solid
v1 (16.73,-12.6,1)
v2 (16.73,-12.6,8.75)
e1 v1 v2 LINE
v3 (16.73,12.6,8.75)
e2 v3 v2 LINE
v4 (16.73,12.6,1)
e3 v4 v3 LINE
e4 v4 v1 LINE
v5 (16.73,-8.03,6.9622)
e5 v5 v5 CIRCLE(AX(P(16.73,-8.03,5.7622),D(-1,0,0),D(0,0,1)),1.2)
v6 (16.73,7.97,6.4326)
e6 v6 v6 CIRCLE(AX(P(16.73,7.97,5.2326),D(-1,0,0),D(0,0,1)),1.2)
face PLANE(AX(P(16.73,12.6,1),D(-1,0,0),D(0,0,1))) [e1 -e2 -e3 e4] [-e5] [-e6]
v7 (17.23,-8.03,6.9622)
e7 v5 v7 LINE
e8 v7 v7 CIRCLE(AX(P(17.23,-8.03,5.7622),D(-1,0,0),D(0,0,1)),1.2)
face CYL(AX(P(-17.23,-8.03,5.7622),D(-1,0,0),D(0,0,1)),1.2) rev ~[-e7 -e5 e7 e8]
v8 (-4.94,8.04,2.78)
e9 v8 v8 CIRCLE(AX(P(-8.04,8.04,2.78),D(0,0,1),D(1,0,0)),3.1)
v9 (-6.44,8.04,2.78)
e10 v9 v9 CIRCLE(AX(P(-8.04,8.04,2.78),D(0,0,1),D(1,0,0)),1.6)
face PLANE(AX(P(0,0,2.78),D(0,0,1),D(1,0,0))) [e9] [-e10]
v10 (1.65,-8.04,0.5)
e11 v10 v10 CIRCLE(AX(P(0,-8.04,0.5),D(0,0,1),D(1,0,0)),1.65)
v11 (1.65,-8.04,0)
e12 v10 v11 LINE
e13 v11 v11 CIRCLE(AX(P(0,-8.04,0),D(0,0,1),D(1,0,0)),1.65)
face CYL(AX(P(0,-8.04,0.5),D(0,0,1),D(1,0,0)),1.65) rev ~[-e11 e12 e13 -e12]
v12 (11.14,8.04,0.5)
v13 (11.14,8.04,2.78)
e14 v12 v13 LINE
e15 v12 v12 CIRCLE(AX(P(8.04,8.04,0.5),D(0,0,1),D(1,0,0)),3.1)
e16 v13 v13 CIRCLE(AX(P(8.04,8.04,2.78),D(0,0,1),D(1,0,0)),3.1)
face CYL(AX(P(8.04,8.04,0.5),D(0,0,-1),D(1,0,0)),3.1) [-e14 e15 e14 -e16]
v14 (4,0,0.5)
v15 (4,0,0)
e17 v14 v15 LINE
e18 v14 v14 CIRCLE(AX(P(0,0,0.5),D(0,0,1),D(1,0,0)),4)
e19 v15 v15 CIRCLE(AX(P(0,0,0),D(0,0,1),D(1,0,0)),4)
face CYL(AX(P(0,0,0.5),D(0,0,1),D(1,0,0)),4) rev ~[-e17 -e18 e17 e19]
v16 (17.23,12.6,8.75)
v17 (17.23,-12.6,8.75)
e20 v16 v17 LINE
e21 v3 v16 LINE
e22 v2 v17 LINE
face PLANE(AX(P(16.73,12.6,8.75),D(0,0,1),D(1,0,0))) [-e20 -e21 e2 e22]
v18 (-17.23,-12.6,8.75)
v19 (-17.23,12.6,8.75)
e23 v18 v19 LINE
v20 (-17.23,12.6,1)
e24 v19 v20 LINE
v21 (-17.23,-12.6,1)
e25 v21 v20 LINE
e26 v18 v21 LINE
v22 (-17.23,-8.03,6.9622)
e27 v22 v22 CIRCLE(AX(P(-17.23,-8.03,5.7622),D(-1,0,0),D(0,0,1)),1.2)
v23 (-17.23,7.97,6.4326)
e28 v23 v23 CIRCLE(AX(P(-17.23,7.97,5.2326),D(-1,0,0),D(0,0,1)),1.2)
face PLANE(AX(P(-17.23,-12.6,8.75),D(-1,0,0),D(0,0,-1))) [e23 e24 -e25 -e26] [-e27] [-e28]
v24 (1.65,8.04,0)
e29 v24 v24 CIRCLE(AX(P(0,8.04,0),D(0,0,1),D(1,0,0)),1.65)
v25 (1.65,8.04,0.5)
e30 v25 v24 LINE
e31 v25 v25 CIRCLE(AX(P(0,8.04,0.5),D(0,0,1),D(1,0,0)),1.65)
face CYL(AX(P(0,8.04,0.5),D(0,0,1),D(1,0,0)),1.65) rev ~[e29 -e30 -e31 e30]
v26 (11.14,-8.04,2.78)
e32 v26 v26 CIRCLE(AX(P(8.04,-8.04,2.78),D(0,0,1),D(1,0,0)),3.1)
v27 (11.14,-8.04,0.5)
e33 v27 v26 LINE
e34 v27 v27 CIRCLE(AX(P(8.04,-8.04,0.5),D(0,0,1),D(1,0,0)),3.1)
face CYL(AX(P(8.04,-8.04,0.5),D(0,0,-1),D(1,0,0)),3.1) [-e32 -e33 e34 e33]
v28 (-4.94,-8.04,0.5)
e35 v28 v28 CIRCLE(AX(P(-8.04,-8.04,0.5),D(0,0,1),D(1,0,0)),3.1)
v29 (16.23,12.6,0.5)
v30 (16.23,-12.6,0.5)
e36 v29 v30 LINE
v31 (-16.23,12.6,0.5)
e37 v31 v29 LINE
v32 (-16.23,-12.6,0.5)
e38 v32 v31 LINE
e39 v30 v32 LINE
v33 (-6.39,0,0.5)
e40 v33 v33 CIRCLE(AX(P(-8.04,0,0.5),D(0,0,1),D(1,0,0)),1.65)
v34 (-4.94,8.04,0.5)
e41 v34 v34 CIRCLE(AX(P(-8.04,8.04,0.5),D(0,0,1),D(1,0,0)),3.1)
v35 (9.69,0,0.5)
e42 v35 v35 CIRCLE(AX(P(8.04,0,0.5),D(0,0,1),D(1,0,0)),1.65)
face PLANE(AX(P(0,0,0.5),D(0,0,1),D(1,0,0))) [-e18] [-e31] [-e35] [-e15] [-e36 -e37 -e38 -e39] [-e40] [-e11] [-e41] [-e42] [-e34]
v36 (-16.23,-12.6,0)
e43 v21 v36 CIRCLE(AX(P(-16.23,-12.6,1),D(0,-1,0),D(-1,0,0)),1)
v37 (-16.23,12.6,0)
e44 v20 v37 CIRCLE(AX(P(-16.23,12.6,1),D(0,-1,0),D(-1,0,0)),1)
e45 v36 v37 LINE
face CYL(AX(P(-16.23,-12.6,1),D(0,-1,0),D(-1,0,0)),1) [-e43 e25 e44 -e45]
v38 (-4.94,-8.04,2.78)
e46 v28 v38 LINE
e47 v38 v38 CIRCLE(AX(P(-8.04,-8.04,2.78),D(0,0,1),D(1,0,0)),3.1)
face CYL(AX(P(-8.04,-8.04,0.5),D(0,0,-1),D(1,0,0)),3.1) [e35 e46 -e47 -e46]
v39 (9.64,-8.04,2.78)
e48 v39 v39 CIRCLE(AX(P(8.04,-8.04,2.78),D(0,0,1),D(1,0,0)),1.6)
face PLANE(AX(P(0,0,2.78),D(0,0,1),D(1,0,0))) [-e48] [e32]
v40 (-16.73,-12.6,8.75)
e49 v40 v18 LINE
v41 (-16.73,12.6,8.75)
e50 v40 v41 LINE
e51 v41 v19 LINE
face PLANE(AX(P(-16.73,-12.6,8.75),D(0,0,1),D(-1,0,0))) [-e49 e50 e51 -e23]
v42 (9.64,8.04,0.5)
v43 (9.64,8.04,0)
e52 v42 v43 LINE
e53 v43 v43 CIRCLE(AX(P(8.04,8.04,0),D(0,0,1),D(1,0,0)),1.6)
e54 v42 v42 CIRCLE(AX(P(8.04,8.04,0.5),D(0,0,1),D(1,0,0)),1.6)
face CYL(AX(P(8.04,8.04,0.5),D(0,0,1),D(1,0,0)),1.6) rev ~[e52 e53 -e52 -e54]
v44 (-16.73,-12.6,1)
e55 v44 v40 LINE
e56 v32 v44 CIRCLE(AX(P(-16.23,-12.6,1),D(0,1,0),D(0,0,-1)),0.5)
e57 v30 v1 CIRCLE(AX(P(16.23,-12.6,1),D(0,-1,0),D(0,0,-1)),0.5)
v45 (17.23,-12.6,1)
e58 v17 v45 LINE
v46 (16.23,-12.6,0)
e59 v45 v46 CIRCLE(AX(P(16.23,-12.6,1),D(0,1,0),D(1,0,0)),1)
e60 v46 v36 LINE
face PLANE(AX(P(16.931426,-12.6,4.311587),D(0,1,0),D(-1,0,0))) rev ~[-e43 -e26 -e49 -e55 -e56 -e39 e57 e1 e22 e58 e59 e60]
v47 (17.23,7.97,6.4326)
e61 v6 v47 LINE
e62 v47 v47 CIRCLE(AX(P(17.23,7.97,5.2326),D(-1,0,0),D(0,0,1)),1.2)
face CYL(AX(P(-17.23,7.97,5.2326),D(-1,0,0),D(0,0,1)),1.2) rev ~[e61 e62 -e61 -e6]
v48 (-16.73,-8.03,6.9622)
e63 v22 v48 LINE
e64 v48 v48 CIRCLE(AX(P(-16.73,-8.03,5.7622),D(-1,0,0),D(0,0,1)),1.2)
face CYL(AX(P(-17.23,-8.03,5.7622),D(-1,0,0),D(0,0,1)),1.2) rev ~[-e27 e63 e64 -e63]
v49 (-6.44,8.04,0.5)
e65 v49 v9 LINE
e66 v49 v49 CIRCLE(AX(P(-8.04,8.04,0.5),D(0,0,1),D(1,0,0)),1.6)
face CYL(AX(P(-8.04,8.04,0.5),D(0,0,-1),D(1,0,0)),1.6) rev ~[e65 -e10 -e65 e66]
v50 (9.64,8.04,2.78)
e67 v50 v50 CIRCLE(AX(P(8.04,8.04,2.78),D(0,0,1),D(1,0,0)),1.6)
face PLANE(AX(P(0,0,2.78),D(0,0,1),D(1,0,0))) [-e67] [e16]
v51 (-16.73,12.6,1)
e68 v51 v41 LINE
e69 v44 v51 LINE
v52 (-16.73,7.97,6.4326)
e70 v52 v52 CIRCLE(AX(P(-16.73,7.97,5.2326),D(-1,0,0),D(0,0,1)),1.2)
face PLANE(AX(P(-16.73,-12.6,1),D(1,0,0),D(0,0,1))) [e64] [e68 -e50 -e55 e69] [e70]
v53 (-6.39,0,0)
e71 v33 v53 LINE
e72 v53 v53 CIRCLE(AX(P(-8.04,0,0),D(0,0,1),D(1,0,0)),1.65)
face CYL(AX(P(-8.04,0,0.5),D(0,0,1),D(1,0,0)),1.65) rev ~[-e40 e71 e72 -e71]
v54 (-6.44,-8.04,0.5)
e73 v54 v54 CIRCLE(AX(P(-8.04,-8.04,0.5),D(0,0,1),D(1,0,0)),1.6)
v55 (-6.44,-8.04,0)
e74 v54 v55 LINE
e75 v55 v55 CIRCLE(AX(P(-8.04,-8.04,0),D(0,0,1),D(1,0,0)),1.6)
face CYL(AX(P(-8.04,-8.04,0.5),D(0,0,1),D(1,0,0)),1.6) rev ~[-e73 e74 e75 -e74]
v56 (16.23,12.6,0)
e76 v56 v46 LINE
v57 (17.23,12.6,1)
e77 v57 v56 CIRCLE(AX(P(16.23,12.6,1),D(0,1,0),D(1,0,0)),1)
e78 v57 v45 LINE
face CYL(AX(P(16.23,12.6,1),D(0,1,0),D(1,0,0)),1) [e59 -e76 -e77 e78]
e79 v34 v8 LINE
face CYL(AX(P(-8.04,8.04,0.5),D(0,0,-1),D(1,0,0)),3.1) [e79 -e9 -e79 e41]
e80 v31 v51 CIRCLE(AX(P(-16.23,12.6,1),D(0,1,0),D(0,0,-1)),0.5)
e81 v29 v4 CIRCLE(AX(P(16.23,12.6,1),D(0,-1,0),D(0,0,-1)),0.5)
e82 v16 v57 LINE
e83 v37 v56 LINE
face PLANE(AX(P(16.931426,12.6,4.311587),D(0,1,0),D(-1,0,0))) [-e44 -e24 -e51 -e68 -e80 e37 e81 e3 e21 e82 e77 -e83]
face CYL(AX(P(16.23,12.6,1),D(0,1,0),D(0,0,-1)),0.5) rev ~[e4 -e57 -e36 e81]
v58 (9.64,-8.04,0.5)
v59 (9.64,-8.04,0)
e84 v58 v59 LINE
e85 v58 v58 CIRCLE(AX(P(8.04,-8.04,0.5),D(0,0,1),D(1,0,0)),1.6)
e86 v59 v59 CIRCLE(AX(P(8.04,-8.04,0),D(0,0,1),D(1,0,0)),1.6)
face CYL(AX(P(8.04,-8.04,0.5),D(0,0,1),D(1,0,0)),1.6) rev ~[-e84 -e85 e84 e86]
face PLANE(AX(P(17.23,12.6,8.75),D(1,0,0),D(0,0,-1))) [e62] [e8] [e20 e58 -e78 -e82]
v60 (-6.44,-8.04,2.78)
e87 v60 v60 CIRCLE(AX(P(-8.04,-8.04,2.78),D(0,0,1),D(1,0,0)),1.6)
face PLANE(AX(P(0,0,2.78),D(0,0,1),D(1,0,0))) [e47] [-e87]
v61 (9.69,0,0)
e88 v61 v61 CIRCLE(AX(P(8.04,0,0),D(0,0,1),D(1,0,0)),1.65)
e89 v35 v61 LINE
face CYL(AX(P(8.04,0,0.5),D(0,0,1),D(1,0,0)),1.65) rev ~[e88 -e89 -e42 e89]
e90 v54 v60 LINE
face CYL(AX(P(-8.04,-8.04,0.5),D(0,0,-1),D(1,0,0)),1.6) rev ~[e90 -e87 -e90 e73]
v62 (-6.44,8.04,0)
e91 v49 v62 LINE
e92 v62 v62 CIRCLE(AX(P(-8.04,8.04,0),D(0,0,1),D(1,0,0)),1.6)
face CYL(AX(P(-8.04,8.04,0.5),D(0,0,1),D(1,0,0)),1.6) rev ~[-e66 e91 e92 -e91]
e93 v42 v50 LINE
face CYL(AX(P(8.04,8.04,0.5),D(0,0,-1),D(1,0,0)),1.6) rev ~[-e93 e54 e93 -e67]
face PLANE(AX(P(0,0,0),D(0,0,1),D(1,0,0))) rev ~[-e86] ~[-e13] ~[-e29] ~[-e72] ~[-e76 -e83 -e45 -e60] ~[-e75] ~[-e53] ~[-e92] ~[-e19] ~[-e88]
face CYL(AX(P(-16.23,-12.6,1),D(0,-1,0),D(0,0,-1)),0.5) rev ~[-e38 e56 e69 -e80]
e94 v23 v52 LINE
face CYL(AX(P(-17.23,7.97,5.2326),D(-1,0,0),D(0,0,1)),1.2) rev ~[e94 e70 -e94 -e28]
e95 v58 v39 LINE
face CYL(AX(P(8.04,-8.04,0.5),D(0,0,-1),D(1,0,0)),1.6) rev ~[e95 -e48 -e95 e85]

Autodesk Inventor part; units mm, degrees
ref_plane "YZ Plane" through (0, 0, 0) normal (1, 0, 0) x (0, 1, 0)
ref_plane "XZ Plane" through (0, 0, 0) normal (0, 1, 0) x (-1, 0, 0)
ref_plane "XY Plane" through (0, 0, 0) normal (0, 0, 1) x (1, 0, 0)
sketch "Sketch1" plane through (0, 0, 0) normal (0, 0, 1) x (1, 0, 0)
  line L0 (-17.23, 12.6) -> (17.23, 12.6)
  line L1 (17.23, 12.6) -> (17.23, -12.6)
  line L2 (17.23, -12.6) -> (-17.23, -12.6)
  line L3 (-17.23, -12.6) -> (-17.23, 12.6)
  point P0 (0, 0)
  dimension "d0" = 17.23
  dimension "d1" = 34.46
  dimension "d2" = 12.6
  dimension "d3" = 25.2
extrude "Plate1" add sketch "Sketch1" along normal blind 0.5
sketch "Sketch4" plane through (-16.73, -12.6, 0) normal (-1, 0, 0) x (0, -1, 0)
  line L0 (-25.2, 0) -> (0, 0)
  line L1 (0, 0) -> (0, 8.75)
  line L2 (0, 8.75) -> (-25.2, 8.75)
  line L3 (-25.2, 8.75) -> (-25.2, 0)
edge flange "Flange1" height 8.75 angle 90 thickness 0.5 bend radius 0.5 thickness toward (-1, 0, 0) relief straight relief width 0.5 relief depth 0.25 edges at (-17.23, 0, 0.5) wall of the first edge with corners at (-16.73, 12.6, 0) (-16.73, -12.6, 0) (-16.73, -12.6, 8.75) (-16.73, 12.6, 8.75)
bend "Bend1"
corner "Corner1"
sketch "Sketch5" plane through (16.73, 12.6, 0) normal (1, 0, 0) x (0, 1, 0)
  line L0 (-25.2, 0) -> (0, 0)
  line L1 (0, 0) -> (0, 8.75)
  line L2 (0, 8.75) -> (-25.2, 8.75)
  line L3 (-25.2, 8.75) -> (-25.2, 0)
edge flange "Flange2" height 8.75 angle 90 thickness 0.5 bend radius 0.5 thickness toward (1, 0, 0) relief straight relief width 0.5 relief depth 0.25 edges at (17.23, 0, 0.5) wall of the first edge with corners at (16.73, -12.6, 0) (16.73, 12.6, 0) (16.73, 12.6, 8.75) (16.73, -12.6, 8.75)
bend "Bend2"
corner "Corner2"
sketch "Sketch6" plane through (0, 0, 0.5) normal (0, 0, 1) x (1, 0, 0)
  circle A0 centre (0, 0) radius 4
  circle A1 centre (0, 8.04) radius 1.65
  circle A2 centre (0, -8.04) radius 1.65
  circle A3 centre (8.04, 0) radius 1.65
  circle A4 centre (-8.04, 0) radius 1.65
  line L0 (16.23, -12.6) -> (-16.23, -12.6) projected
  line L1 (-16.23, 12.6) -> (16.23, 12.6) projected
  dimension "d26" = 3.3
  dimension "d27" = 8
  dimension "d29" = 4.56
  dimension "d30" = 4.56
  dimension "d31" = 8.04
  dimension "d32" = 8.04
  dimension "d33" = 8.04
extrude "Extrusion1" cut sketch "Sketch6" against normal through all
sketch "Sketch7" plane through (0, 0, 0.5) normal (0, 0, 1) x (1, 0, 0)
  circle A0 centre (0, 8.04) radius 1.65 projected
  circle A1 centre (-8.04, 0) radius 1.65 projected
  circle A2 centre (-8.04, 8.04) radius 1.6
  line L0 (0, -17.64) -> (0, 17.64) projected
  line L1 (-24.122, 0) -> (24.122, 0) projected
  circle A3 centre (8.04, 8.04) radius 1.6
  circle A4 centre (-8.04, -8.04) radius 1.6
  circle A5 centre (8.04, -8.04) radius 1.6
  point P0 (0, 0)
  dimension "d36" = 3.2
extrude "Extrusion2" cut sketch "Sketch7" against normal through all contours A2 | A3 | A4 | A5
sketch "Sketch8" plane through (0, 0, 0.5) normal (0, 0, 1) x (1, 0, 0)
  circle A0 centre (-8.04, 8.04) radius 1.6 projected
  circle A1 centre (8.04, 8.04) radius 1.6 projected
  circle A2 centre (8.04, -8.04) radius 1.6 projected
  circle A3 centre (-8.04, -8.04) radius 1.6 projected
  circle A4 centre (-8.04, 8.04) radius 3.1
  circle A5 centre (8.04, 8.04) radius 3.1
  circle A6 centre (8.04, -8.04) radius 3.1
  circle A7 centre (-8.04, -8.04) radius 3.1
  point P0 (0, 0)
  dimension "d39" = 6.2
extrude "Extrusion3" add sketch "Sketch8" along normal blind 2.28
thread "Thread1" size "M3.5x0.6" class "6H" standard "ANSI Metric M Profile" full length
thread "Thread2" size "M3.5x0.6" class "6H" standard "ANSI Metric M Profile" full length
thread "Thread3" size "M3.5x0.6" class "6H" standard "ANSI Metric M Profile" full length
thread "Thread4" size "M3.5x0.6" class "6H" standard "ANSI Metric M Profile" full length
sketch "Sketch9" plane through (-17.23, -12.6, 8.75) normal (-1, 0, 0) x (0, 0, 1)
  circle A0 centre (-3.5174, 20.57) radius 1.2
  circle A1 centre (-2.9878, 4.57) radius 1.2
  line L0 (-7.75, 25.2) -> (0, 25.2) projected
  point P0 (-8.75, 12.6)
  dimension "d50" = 2.4
  dimension "d51" = 16
  dimension "d52" = 4.63
extrude "Extrusion4" cut sketch "Sketch9" against normal through all
equation "\"d30\" = d29"
equation "\"d6\" = BendReliefWidth"
equation "\"d7\" = BendReliefDepth"
equation "\"d8\" = MinimumRemnant"
equation "\"d9\" = BendRadius"
equation "\"d12\" = BendRadius"
equation "\"d13\" = CornerReliefSize"
equation "\"d14\" = GapSize"
equation "\"d15\" = JacobiRadiusSize"
equation "\"d16\" = BendReliefWidth"
equation "\"d17\" = BendReliefDepth"
equation "\"d18\" = MinimumRemnant"
equation "\"d19\" = BendRadius"
equation "\"d22\" = BendRadius"
equation "\"d23\" = CornerReliefSize"
equation "\"d24\" = GapSize"
equation "\"d25\" = JacobiRadiusSize"
equation "\"d32\" = d31"
equation "\"d33\" = d32"
equation "\"d0\" = 0.5 * d1"
equation "\"d2\" = 0.5 * d3"
equation "\"BendRadius\" = Thickness"
equation "\"BendReliefWidth\" = Thickness"
equation "\"BendReliefDepth\" = 0.5 * Thickness"
equation "\"CornerReliefSize\" = 4 * Thickness"
equation "\"MinimumRemnant\" = 2 * Thickness"
equation "\"TransitionRadius\" = BendRadius"
equation "\"JacobiRadiusSize\" = Thickness"
equation "\"GapSize\" = Thickness"
equation "\"d4\" = BendRadius"
equation "\"Thickness\" = 0.5"
properties part number "Servo Bracket"
